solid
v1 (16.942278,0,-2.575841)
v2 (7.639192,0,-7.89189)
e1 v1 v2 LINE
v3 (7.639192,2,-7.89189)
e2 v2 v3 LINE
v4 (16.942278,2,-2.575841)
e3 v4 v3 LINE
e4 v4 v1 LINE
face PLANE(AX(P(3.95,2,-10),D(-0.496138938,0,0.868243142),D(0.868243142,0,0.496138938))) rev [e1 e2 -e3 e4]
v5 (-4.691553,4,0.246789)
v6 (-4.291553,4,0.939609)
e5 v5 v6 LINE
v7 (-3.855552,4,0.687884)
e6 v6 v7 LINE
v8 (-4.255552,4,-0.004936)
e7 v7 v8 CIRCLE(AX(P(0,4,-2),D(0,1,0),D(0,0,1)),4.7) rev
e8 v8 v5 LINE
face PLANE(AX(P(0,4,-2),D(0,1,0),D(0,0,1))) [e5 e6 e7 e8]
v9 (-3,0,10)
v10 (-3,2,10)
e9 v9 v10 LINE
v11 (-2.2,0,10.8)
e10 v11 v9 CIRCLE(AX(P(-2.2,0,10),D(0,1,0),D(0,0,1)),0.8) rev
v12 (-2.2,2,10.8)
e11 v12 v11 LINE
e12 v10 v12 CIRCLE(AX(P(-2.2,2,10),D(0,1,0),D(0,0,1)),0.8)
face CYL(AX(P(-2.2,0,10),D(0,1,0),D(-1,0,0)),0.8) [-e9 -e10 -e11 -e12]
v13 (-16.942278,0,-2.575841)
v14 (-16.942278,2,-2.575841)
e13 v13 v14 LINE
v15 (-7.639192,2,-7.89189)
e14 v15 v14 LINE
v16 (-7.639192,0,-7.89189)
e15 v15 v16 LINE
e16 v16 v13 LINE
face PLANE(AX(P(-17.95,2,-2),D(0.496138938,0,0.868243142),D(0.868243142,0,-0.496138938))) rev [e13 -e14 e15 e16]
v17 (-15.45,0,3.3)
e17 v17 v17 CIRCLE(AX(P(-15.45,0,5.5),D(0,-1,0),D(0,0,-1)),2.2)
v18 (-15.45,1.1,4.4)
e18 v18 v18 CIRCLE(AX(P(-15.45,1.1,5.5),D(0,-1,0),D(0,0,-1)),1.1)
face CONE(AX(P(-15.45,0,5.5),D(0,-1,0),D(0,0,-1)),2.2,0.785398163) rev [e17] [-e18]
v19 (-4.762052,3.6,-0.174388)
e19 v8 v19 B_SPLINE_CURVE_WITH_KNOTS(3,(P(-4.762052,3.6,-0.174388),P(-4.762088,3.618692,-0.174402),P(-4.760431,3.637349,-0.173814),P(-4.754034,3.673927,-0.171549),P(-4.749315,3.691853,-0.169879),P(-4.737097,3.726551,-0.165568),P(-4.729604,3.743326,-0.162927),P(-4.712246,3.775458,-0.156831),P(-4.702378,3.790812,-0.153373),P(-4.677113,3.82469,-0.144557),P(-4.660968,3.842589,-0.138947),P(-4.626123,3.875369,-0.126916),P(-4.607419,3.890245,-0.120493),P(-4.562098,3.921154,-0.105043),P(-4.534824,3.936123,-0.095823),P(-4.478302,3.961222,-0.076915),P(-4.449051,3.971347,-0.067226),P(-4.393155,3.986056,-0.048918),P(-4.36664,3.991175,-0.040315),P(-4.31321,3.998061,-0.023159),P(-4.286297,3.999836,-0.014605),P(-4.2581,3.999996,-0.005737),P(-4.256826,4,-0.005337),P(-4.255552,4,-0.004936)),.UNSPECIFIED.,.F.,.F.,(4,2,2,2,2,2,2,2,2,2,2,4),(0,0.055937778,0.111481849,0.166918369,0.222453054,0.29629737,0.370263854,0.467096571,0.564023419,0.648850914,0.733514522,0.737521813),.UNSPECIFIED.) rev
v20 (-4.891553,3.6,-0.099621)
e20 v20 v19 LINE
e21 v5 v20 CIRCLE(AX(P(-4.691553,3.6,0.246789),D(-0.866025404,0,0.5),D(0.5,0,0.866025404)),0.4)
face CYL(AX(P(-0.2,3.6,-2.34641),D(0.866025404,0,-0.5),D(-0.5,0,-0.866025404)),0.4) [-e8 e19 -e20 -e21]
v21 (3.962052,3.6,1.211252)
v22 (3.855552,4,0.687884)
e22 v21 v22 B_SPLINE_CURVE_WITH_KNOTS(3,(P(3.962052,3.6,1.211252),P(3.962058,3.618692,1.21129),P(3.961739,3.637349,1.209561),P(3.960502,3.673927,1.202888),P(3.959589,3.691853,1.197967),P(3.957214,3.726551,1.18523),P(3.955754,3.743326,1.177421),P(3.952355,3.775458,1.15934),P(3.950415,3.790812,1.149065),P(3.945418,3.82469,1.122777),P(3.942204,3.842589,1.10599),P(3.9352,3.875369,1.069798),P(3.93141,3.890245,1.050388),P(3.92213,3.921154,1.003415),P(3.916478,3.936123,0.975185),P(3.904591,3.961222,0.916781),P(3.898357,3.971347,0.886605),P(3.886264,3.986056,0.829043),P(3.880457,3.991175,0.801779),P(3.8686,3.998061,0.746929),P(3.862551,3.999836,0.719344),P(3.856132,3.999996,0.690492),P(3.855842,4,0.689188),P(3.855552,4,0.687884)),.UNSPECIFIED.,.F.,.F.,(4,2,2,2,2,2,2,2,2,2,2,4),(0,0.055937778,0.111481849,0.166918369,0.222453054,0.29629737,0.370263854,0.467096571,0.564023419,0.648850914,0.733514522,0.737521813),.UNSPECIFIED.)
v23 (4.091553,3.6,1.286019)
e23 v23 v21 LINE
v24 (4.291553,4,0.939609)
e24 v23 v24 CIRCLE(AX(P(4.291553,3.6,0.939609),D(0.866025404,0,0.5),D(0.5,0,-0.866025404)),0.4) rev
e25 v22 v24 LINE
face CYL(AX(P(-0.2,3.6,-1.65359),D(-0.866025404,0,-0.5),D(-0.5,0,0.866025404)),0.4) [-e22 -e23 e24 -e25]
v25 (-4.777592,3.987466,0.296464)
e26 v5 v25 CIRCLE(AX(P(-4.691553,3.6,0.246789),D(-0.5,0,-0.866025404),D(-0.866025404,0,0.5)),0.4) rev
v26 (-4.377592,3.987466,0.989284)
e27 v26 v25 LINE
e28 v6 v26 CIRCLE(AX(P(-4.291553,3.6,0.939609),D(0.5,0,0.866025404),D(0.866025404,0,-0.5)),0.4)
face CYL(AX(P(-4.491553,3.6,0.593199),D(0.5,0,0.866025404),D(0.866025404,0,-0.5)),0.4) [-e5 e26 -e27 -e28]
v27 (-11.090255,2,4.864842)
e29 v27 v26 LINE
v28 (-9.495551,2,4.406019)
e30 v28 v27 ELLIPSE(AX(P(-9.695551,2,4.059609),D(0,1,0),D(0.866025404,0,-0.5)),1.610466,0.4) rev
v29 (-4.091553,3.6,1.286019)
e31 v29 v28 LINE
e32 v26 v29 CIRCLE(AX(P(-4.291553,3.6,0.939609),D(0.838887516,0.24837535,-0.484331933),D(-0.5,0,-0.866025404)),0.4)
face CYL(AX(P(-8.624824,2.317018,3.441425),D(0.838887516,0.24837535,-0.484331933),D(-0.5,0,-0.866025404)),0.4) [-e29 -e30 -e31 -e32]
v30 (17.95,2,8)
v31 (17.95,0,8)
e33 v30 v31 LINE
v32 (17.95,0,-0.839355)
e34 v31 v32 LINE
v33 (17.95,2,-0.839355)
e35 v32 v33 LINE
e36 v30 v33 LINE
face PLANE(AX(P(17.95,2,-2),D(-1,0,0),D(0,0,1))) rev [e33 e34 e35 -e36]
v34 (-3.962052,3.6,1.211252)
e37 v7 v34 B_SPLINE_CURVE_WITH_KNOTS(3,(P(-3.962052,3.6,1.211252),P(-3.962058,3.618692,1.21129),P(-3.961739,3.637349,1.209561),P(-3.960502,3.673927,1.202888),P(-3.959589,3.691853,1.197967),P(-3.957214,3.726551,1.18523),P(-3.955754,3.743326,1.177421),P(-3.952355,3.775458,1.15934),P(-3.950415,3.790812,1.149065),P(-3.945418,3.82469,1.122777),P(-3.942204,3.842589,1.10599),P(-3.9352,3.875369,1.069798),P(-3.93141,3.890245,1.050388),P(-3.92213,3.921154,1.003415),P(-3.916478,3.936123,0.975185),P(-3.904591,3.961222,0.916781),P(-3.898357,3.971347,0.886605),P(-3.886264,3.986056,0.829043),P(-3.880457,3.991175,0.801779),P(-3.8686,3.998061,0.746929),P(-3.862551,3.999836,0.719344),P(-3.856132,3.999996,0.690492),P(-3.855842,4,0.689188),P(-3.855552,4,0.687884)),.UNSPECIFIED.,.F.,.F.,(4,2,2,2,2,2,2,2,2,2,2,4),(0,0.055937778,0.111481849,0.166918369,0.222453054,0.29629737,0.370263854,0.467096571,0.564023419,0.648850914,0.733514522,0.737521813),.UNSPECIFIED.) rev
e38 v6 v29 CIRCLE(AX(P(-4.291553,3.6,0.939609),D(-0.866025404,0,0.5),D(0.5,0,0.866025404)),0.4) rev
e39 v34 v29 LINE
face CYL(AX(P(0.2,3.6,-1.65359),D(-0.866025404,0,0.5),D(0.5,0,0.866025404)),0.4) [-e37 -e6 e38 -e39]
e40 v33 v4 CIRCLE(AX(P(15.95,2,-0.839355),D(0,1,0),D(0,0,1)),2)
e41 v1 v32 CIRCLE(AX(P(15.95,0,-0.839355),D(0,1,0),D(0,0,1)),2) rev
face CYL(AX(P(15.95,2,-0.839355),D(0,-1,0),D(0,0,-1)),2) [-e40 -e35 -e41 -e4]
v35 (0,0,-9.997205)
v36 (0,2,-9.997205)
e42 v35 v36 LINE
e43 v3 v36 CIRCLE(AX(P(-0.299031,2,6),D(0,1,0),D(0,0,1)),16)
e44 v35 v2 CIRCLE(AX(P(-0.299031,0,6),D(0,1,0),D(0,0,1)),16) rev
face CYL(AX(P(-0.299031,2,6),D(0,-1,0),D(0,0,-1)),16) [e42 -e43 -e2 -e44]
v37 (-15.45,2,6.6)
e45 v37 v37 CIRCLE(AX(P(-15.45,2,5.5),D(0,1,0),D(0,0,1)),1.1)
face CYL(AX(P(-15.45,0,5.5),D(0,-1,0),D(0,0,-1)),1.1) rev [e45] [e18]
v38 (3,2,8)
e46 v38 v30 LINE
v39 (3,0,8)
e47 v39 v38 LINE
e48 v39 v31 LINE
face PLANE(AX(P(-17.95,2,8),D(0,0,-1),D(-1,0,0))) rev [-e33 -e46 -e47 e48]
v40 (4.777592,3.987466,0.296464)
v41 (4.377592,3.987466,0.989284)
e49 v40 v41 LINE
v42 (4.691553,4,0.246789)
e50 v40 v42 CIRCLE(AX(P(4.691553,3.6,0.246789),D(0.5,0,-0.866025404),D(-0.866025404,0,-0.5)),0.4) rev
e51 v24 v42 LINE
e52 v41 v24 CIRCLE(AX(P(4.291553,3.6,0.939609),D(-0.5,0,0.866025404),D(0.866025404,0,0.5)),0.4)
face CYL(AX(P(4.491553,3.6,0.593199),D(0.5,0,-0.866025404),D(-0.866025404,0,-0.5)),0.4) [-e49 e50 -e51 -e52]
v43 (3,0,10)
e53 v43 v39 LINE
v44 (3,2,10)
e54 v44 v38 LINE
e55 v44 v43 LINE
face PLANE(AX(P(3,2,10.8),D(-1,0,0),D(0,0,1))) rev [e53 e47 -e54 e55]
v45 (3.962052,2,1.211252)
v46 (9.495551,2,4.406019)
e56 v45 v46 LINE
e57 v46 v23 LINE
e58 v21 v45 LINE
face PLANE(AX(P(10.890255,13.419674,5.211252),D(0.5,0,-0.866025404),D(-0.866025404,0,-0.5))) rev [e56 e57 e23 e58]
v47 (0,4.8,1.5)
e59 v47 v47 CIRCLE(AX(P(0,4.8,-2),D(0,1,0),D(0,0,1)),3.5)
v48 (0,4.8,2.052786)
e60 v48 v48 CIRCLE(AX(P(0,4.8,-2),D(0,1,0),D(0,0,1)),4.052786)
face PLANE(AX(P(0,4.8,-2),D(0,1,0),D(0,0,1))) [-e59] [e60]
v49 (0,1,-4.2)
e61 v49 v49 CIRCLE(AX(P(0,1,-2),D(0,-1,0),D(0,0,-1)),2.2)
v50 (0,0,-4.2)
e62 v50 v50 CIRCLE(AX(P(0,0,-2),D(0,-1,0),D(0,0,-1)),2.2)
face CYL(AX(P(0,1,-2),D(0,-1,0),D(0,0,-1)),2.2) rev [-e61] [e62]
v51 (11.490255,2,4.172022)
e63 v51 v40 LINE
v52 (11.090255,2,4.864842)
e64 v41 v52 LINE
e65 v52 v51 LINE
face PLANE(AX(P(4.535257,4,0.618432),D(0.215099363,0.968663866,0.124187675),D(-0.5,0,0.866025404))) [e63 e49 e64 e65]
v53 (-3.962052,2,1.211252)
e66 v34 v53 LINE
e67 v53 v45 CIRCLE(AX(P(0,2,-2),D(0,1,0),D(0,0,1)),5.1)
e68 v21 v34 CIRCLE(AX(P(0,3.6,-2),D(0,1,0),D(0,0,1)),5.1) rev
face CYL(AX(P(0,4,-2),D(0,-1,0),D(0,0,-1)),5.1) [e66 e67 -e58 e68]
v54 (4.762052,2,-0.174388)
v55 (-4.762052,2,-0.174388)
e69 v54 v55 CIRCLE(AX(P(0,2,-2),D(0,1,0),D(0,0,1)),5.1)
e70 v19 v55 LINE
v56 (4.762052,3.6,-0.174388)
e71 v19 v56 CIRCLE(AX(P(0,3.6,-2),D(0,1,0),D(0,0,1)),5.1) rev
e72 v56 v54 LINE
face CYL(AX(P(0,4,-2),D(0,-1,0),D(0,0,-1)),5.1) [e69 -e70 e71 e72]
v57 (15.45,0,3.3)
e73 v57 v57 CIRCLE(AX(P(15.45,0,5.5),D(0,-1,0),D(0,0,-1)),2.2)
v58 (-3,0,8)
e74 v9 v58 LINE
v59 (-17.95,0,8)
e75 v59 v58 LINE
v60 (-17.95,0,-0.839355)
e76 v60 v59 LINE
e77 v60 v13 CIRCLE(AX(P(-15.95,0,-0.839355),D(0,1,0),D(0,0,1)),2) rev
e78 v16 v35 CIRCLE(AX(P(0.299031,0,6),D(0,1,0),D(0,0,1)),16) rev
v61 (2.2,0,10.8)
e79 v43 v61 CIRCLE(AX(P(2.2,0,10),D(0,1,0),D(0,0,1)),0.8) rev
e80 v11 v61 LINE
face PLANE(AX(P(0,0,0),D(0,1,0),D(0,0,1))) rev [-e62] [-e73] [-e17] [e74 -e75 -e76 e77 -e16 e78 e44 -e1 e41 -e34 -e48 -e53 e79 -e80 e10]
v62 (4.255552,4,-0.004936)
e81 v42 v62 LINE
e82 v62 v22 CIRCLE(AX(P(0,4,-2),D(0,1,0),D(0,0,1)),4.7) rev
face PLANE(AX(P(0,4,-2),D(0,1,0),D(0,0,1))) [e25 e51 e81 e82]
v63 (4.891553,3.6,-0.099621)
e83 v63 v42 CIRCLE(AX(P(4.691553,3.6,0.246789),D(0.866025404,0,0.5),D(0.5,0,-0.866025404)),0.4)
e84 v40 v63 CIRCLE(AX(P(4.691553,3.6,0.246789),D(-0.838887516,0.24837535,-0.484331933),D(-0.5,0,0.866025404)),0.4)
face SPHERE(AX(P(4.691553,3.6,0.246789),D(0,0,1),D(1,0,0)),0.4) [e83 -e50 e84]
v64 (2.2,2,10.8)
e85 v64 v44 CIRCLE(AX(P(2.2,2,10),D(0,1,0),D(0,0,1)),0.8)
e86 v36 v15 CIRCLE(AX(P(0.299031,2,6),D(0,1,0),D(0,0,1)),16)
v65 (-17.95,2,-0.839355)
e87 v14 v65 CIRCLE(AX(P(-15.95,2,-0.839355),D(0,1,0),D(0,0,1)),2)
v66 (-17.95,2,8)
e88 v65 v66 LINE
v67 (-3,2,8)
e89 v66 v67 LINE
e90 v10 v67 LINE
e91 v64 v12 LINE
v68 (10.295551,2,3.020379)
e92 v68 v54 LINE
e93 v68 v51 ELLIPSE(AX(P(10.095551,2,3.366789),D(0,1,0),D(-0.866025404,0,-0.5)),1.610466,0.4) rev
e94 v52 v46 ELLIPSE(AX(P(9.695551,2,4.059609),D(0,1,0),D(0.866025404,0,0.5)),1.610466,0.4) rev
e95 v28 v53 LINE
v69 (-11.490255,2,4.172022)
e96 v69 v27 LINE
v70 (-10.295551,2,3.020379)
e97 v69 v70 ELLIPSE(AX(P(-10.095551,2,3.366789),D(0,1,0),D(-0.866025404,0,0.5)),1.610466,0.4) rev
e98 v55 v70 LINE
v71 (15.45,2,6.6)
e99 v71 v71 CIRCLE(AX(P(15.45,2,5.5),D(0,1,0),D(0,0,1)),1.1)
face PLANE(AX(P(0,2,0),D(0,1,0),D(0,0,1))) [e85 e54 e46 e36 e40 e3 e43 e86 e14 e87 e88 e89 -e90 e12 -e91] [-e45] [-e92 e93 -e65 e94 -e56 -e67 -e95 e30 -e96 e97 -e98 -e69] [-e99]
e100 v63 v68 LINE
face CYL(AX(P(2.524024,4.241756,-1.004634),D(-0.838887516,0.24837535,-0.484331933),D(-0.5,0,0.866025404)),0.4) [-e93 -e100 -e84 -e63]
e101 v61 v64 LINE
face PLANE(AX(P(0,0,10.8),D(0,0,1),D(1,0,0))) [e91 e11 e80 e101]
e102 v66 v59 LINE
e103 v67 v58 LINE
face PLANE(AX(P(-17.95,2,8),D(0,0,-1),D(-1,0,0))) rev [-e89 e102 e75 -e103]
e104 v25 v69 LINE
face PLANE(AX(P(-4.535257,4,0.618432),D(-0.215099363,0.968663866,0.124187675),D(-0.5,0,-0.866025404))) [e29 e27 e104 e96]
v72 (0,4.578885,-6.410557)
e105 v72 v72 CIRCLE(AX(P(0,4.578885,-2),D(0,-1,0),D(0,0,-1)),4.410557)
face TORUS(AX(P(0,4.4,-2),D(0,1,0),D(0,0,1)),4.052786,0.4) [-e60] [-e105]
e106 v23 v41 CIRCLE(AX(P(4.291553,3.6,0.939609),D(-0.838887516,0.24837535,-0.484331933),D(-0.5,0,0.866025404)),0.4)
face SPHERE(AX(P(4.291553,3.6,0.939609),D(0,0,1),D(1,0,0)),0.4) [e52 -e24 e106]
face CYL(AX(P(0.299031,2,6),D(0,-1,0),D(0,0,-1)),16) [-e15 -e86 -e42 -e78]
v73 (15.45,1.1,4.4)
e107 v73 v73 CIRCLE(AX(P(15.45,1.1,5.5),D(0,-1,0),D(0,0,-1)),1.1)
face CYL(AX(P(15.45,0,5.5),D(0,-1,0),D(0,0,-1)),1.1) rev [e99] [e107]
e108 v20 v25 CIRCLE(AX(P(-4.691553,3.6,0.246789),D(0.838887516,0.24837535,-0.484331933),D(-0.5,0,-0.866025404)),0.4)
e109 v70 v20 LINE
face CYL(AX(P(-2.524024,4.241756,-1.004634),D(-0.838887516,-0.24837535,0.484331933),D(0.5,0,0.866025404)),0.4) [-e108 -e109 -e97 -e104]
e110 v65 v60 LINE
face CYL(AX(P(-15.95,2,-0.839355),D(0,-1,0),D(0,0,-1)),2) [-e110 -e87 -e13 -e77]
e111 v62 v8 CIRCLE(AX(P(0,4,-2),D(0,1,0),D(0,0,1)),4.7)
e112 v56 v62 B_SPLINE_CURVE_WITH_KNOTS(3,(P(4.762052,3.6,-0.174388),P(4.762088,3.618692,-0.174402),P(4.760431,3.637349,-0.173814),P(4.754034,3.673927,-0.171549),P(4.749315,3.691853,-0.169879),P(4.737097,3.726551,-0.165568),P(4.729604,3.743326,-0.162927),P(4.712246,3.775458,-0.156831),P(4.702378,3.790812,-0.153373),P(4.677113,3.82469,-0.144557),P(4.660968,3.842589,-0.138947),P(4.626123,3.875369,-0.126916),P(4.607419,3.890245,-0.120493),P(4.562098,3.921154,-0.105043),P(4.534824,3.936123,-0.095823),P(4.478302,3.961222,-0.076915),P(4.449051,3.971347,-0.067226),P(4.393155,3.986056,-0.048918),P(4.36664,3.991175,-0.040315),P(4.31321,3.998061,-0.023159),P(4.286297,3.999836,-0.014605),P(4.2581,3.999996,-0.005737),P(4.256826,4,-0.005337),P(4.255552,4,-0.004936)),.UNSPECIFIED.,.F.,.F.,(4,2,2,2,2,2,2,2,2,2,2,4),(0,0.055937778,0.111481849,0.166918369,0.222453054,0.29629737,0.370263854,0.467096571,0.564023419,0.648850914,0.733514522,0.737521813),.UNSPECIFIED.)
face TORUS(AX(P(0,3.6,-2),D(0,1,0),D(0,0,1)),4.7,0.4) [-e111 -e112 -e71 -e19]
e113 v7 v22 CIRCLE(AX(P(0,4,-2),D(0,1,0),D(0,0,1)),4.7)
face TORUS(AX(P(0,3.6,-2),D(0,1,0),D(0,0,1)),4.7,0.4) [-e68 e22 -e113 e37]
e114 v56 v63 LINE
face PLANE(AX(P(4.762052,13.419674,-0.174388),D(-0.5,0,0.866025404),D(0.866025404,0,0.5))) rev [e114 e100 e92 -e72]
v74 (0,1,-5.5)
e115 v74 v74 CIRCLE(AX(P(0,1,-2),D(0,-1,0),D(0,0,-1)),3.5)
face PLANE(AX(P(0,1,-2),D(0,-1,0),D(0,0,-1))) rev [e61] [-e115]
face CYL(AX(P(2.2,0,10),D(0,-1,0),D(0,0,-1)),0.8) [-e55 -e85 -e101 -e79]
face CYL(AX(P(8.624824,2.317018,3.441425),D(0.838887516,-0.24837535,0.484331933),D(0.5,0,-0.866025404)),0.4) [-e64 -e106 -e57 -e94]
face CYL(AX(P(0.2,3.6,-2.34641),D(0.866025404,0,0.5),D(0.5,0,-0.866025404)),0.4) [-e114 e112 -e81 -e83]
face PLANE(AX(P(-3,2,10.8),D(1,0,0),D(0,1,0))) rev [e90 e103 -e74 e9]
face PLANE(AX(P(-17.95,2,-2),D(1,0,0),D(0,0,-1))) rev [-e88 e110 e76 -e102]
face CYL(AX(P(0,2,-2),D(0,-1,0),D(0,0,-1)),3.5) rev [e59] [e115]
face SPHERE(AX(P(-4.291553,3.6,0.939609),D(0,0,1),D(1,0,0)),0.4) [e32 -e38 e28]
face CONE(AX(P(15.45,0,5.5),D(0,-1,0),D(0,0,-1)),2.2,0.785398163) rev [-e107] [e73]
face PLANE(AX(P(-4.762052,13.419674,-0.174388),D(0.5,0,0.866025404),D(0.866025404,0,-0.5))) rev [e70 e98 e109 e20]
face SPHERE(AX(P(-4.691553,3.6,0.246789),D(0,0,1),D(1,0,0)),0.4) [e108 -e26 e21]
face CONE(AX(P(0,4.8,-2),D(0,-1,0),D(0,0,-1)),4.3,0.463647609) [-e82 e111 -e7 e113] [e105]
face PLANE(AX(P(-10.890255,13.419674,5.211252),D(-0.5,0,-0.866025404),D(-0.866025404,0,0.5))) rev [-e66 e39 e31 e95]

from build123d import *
from OCP.BRepFilletAPI import BRepFilletAPI_MakeChamfer

# Parameters (mm, degrees)
SKETCH_1_R                  = 3.5
EXTRUDE_1_DEPTH             = 2
FILLET_1_R                  = 2
FILLET_2_R                  = 16
SKETCH_2_R                  = 5.1000000000000005
SKETCH_2_R_2                = 3.5
EXTRUDE_2_DEPTH             = 2
SKETCH_3_R                  = 3.5
SKETCH_3_R_2                = 2.2
EXTRUDE_3_DEPTH             = 1
EXTRUDE_4_DEPTH             = 2
CHAMFER_1_SIZE              = 7.8
CHAMFER_1_SIZE_2            = 2
FILLET_3_R                  = 0.4
HOLE_WIZARD_M21_D           = 2.2
HOLE_WIZARD_M21_CSINK_D     = 4.4
HOLE_WIZARD_M21_CSINK_ANGLE = 90
EXTRUDE_5_DEPTH             = 2.8
FILLET_4_R                  = 0.8
SKETCH_11_R                 = 4.3
SKETCH_11_R_2               = 3.5
EXTRUDE_6_DEPTH             = 0.8
CHAMFER_2_SIZE2             = 0.8
CHAMFER_2_SIZE              = 0.4


with BuildPart() as part:
    # Эскиз1 → Бобышка-Вытянуть1 (new body)
    with BuildSketch(Plane(origin=(0, 0, 0), x_dir=(1, 0, 0), z_dir=(0, 1, 0))):
        Polygon((-17.95, 2.0000000000000018), (-3.950000000000008, 10), (3.9499999999999997, 10), (17.95, 2.0000000000000018), (17.949999999999996, -7.999999999999998), (-17.950000000000006, -7.999999999999998), align=None)
        with Locations(Location((0, 2.0000000000000018, 0), (0, 0, 270))):
            Circle(SKETCH_1_R, mode=Mode.SUBTRACT)
    extrude(amount=EXTRUDE_1_DEPTH)

    # Скругление1
    fillet_1_edges = [part.edges().sort_by_distance(p)[0] for p in [
        (-17.95, 1, -2.0000000000000018),
        (17.95, 1, -2.0000000000000018),
    ]]
    fillet(fillet_1_edges, radius=FILLET_1_R)

    # Скругление2
    # the kernel refuses this fillet: 16 mm, written as the material it takes off along each edge
    with BuildSketch(Plane(origin=(3.9499999999999997, -10.622577482985493, -10), x_dir=(-1, 0, 0), z_dir=(0, 1, 0))) as fillet_2_piece_1:
        with BuildLine():
            CenterArc((FILLET_2_R * 0.265564437075, FILLET_2_R), FILLET_2_R, 240.25511870305778, 29.744881296942253)
            Line((-FILLET_2_R * 0.230574501282, FILLET_2_R * 0.131756857876), (0, 0))
            Line((0, 0), (FILLET_2_R * 0.265564437075, 0))
        make_face()
    extrude(amount=23.245154965970986, mode=Mode.SUBTRACT)
    with BuildSketch(Plane(origin=(-3.950000000000008, -10.6225774829855, -10), x_dir=(-0.8682431421244592, 0, 0.496138938356834), z_dir=(0, 1, 0))) as fillet_2_piece_2:
        with BuildLine():
            CenterArc((FILLET_2_R * 0.265564437075, FILLET_2_R), FILLET_2_R, 240.25511870305778, 29.744881296942253)
            Line((-FILLET_2_R * 0.230574501282, FILLET_2_R * 0.131756857876), (0, 0))
            Line((0, 0), (FILLET_2_R * 0.265564437075, 0))
        make_face()
    extrude(amount=23.245154965971, mode=Mode.SUBTRACT)

    # Эскиз2 → Бобышка-Вытянуть2 (add)
    with BuildSketch(Plane(origin=(0, 2, 0), x_dir=(1, 0, 0), z_dir=(0, 1, 0))):
        with Locations(Location((0, 2.0000000000000018, 0), (0, 0, 270))):
            Circle(SKETCH_2_R)
        with Locations(Location((0, 2.0000000000000018, 0), (0, 0, 270))):
            Circle(SKETCH_2_R_2, mode=Mode.SUBTRACT)
    extrude(amount=EXTRUDE_2_DEPTH)

    # Эскиз3 → Бобышка-Вытянуть3 (add)
    with BuildSketch(Plane.XZ):
        with Locations(Location((0, -2.0000000000000018, 0), (0, 0, 270))):
            Circle(SKETCH_3_R)
        with Locations(Location((0, -2.0000000000000018, 0), (0, 0, 270))):
            Circle(SKETCH_3_R_2, mode=Mode.SUBTRACT)
    extrude(amount=-EXTRUDE_3_DEPTH)

    # Эскиз4 → Бобышка-Вытянуть4 (add)
    with BuildSketch(Plane(origin=(0, 2, 0), x_dir=(1, 0, 0), z_dir=(0, 1, 0))):
        Polygon((-4.762052269287931, 0.1743882711349406), (-11.690255499563435, -3.8256117288650744), (-10.890255499563432, -5.211252374920172), (-3.962052269287929, -1.21125237492016), align=None)
        Polygon((10.890255499563436, -5.21125237492017), (3.9620522692879283, -1.2112523749201598), (4.762052269287931, 0.17438827113494176), (11.690255499563435, -3.8256117288650713), align=None)
    extrude(amount=EXTRUDE_4_DEPTH)

    # Фаска1
    chamfer_1_edges_1 = [part.edges().sort_by_distance(p)[0] for p in [
        (11.290255499563436, 4, 4.518432051892621),
    ]]
    chamfer_1_side_1 = [part.faces().sort_by_distance(p)[0] for p in [
        (11.255614483412058, 4, 4.498432051892621),
    ]]
    chamfer_1_edges_2 = [part.edges().sort_by_distance(p)[0] for p in [
        (-11.290255499563433, 4, 4.518432051892623),
    ]]
    chamfer_1_side_2 = [part.faces().sort_by_distance(p)[0] for p in [
        (-11.290255499563433, 3.96, 4.518432051892623),
    ]]
    chamfer_1 = BRepFilletAPI_MakeChamfer(part.part.solid().wrapped)
    for e in chamfer_1_edges_1:
        chamfer_1.Add(CHAMFER_1_SIZE - 0.0001, CHAMFER_1_SIZE_2 - 0.0001, e.wrapped, chamfer_1_side_1[0].wrapped)
    for e in chamfer_1_edges_2:
        chamfer_1.Add(CHAMFER_1_SIZE_2 - 0.0001, CHAMFER_1_SIZE - 0.0001, e.wrapped, chamfer_1_side_2[0].wrapped)
    add(Compound.cast(chamfer_1.Shape()), mode=Mode.REPLACE)  # a hair under: the kernel refuses the full size

    # Скругление3
    fillet_3_edges = [part.edges().sort_by_distance(p)[0] for p in [
        (-4.4e-16, 4, 3.0999999999999996),
        (-4.848698110936565, 4, -0.12436327113493996),
        (1.56e-15, 4, -7.100000000000002),
        (4.048698110936562, 4, 1.2612773749201605),
        (4.8486981109365646, 4, -0.12436327113494133),
        (-4.048698110936562, 4, 1.2612773749201596),
        (-4.5353439525851975, 4, 0.6184820518926107),
        (4.5353439525851975, 4, 0.6184820518926104),
        (8.312799726074315, 3.00005, 1.8756367288650657),
        (7.512799726074316, 3.0000500000000003, 3.261277374920165),
        (-7.512799726074315, 3.0000499999999994, 3.2612773749201676),
        (-8.312799726074317, 3.00005, 1.8756367288650682),
    ]]
    fillet(fillet_3_edges, radius=FILLET_3_R)

    # Зенковка для винта с полупотайной головкой M21 (through all)
    with Locations(Plane(origin=(0, 0, 0), x_dir=(-1, 0, 0), z_dir=(0, -1, 0))):
        with Locations((-15.45, -5.5), (15.45, -5.5)):
            CounterSinkHole(HOLE_WIZARD_M21_D / 2, HOLE_WIZARD_M21_CSINK_D / 2, counter_sink_angle=HOLE_WIZARD_M21_CSINK_ANGLE)

    # Эскиз10 → Бобышка-Вытянуть5 (add)
    with BuildSketch(Plane.XY.offset(7.999999999999998)):
        Polygon((-3.0000000000000044, 2), (2.9999999999999956, 2), (2.9999999999999956, 0), (-3.0000000000000036, 0), align=None)
    extrude(amount=EXTRUDE_5_DEPTH)

    # Скругление4
    fillet_4_edges = [part.edges().sort_by_distance(p)[0] for p in [
        (-3.000000000000004, 1, 10.799999999999997),
        (2.9999999999999956, 1, 10.799999999999997),
    ]]
    fillet(fillet_4_edges, radius=FILLET_4_R)

    # Эскиз11 → Бобышка-Вытянуть6 (add)
    with BuildSketch(Plane(origin=(0, 4, 0), x_dir=(1, 0, 0), z_dir=(0, 1, 0))):
        with Locations(Location((0, 2.0000000000000018, 0), (0, 0, 270))):
            Circle(SKETCH_11_R)
        with Locations(Location((0, 2.0000000000000018, 0), (0, 0, 90))):
            Circle(SKETCH_11_R_2, mode=Mode.SUBTRACT)
    extrude(amount=EXTRUDE_6_DEPTH)

    # Фаска2
    chamfer_2_edges = [part.edges().sort_by_distance(p)[0] for p in [
        (1.32e-15, 4, -6.300000000000002),
    ]]
    chamfer_2_side = [part.faces().sort_by_distance(p)[0] for p in [
        (1.32e-15, 4, -6.308000000000002),
    ]]
    chamfer(chamfer_2_edges, length=CHAMFER_2_SIZE - 0.0001, length2=CHAMFER_2_SIZE2 - 0.0001, reference=chamfer_2_side[0])  # a hair under: the kernel refuses the full size

    # Скругление5: read off the stored shape, not the designer's step
    # Скругление5 outline → Скругление5 (revolve, cut)
    with BuildSketch(Plane.XY.offset(-2)):
        with BuildLine():
            ThreePointArc((4.052786405, 4.8), (4.263078849, 4.740260323), (4.410557281, 4.578885438))
            Line((4.410557281, 4.578885438), (4.410557281, 4.8))
            Line((4.410557281, 4.8), (4.052786405, 4.8))
        make_face()
    revolve(axis=Axis((0, 0, -2), (0, 1, 0)), mode=Mode.SUBTRACT)


solid = part.part
